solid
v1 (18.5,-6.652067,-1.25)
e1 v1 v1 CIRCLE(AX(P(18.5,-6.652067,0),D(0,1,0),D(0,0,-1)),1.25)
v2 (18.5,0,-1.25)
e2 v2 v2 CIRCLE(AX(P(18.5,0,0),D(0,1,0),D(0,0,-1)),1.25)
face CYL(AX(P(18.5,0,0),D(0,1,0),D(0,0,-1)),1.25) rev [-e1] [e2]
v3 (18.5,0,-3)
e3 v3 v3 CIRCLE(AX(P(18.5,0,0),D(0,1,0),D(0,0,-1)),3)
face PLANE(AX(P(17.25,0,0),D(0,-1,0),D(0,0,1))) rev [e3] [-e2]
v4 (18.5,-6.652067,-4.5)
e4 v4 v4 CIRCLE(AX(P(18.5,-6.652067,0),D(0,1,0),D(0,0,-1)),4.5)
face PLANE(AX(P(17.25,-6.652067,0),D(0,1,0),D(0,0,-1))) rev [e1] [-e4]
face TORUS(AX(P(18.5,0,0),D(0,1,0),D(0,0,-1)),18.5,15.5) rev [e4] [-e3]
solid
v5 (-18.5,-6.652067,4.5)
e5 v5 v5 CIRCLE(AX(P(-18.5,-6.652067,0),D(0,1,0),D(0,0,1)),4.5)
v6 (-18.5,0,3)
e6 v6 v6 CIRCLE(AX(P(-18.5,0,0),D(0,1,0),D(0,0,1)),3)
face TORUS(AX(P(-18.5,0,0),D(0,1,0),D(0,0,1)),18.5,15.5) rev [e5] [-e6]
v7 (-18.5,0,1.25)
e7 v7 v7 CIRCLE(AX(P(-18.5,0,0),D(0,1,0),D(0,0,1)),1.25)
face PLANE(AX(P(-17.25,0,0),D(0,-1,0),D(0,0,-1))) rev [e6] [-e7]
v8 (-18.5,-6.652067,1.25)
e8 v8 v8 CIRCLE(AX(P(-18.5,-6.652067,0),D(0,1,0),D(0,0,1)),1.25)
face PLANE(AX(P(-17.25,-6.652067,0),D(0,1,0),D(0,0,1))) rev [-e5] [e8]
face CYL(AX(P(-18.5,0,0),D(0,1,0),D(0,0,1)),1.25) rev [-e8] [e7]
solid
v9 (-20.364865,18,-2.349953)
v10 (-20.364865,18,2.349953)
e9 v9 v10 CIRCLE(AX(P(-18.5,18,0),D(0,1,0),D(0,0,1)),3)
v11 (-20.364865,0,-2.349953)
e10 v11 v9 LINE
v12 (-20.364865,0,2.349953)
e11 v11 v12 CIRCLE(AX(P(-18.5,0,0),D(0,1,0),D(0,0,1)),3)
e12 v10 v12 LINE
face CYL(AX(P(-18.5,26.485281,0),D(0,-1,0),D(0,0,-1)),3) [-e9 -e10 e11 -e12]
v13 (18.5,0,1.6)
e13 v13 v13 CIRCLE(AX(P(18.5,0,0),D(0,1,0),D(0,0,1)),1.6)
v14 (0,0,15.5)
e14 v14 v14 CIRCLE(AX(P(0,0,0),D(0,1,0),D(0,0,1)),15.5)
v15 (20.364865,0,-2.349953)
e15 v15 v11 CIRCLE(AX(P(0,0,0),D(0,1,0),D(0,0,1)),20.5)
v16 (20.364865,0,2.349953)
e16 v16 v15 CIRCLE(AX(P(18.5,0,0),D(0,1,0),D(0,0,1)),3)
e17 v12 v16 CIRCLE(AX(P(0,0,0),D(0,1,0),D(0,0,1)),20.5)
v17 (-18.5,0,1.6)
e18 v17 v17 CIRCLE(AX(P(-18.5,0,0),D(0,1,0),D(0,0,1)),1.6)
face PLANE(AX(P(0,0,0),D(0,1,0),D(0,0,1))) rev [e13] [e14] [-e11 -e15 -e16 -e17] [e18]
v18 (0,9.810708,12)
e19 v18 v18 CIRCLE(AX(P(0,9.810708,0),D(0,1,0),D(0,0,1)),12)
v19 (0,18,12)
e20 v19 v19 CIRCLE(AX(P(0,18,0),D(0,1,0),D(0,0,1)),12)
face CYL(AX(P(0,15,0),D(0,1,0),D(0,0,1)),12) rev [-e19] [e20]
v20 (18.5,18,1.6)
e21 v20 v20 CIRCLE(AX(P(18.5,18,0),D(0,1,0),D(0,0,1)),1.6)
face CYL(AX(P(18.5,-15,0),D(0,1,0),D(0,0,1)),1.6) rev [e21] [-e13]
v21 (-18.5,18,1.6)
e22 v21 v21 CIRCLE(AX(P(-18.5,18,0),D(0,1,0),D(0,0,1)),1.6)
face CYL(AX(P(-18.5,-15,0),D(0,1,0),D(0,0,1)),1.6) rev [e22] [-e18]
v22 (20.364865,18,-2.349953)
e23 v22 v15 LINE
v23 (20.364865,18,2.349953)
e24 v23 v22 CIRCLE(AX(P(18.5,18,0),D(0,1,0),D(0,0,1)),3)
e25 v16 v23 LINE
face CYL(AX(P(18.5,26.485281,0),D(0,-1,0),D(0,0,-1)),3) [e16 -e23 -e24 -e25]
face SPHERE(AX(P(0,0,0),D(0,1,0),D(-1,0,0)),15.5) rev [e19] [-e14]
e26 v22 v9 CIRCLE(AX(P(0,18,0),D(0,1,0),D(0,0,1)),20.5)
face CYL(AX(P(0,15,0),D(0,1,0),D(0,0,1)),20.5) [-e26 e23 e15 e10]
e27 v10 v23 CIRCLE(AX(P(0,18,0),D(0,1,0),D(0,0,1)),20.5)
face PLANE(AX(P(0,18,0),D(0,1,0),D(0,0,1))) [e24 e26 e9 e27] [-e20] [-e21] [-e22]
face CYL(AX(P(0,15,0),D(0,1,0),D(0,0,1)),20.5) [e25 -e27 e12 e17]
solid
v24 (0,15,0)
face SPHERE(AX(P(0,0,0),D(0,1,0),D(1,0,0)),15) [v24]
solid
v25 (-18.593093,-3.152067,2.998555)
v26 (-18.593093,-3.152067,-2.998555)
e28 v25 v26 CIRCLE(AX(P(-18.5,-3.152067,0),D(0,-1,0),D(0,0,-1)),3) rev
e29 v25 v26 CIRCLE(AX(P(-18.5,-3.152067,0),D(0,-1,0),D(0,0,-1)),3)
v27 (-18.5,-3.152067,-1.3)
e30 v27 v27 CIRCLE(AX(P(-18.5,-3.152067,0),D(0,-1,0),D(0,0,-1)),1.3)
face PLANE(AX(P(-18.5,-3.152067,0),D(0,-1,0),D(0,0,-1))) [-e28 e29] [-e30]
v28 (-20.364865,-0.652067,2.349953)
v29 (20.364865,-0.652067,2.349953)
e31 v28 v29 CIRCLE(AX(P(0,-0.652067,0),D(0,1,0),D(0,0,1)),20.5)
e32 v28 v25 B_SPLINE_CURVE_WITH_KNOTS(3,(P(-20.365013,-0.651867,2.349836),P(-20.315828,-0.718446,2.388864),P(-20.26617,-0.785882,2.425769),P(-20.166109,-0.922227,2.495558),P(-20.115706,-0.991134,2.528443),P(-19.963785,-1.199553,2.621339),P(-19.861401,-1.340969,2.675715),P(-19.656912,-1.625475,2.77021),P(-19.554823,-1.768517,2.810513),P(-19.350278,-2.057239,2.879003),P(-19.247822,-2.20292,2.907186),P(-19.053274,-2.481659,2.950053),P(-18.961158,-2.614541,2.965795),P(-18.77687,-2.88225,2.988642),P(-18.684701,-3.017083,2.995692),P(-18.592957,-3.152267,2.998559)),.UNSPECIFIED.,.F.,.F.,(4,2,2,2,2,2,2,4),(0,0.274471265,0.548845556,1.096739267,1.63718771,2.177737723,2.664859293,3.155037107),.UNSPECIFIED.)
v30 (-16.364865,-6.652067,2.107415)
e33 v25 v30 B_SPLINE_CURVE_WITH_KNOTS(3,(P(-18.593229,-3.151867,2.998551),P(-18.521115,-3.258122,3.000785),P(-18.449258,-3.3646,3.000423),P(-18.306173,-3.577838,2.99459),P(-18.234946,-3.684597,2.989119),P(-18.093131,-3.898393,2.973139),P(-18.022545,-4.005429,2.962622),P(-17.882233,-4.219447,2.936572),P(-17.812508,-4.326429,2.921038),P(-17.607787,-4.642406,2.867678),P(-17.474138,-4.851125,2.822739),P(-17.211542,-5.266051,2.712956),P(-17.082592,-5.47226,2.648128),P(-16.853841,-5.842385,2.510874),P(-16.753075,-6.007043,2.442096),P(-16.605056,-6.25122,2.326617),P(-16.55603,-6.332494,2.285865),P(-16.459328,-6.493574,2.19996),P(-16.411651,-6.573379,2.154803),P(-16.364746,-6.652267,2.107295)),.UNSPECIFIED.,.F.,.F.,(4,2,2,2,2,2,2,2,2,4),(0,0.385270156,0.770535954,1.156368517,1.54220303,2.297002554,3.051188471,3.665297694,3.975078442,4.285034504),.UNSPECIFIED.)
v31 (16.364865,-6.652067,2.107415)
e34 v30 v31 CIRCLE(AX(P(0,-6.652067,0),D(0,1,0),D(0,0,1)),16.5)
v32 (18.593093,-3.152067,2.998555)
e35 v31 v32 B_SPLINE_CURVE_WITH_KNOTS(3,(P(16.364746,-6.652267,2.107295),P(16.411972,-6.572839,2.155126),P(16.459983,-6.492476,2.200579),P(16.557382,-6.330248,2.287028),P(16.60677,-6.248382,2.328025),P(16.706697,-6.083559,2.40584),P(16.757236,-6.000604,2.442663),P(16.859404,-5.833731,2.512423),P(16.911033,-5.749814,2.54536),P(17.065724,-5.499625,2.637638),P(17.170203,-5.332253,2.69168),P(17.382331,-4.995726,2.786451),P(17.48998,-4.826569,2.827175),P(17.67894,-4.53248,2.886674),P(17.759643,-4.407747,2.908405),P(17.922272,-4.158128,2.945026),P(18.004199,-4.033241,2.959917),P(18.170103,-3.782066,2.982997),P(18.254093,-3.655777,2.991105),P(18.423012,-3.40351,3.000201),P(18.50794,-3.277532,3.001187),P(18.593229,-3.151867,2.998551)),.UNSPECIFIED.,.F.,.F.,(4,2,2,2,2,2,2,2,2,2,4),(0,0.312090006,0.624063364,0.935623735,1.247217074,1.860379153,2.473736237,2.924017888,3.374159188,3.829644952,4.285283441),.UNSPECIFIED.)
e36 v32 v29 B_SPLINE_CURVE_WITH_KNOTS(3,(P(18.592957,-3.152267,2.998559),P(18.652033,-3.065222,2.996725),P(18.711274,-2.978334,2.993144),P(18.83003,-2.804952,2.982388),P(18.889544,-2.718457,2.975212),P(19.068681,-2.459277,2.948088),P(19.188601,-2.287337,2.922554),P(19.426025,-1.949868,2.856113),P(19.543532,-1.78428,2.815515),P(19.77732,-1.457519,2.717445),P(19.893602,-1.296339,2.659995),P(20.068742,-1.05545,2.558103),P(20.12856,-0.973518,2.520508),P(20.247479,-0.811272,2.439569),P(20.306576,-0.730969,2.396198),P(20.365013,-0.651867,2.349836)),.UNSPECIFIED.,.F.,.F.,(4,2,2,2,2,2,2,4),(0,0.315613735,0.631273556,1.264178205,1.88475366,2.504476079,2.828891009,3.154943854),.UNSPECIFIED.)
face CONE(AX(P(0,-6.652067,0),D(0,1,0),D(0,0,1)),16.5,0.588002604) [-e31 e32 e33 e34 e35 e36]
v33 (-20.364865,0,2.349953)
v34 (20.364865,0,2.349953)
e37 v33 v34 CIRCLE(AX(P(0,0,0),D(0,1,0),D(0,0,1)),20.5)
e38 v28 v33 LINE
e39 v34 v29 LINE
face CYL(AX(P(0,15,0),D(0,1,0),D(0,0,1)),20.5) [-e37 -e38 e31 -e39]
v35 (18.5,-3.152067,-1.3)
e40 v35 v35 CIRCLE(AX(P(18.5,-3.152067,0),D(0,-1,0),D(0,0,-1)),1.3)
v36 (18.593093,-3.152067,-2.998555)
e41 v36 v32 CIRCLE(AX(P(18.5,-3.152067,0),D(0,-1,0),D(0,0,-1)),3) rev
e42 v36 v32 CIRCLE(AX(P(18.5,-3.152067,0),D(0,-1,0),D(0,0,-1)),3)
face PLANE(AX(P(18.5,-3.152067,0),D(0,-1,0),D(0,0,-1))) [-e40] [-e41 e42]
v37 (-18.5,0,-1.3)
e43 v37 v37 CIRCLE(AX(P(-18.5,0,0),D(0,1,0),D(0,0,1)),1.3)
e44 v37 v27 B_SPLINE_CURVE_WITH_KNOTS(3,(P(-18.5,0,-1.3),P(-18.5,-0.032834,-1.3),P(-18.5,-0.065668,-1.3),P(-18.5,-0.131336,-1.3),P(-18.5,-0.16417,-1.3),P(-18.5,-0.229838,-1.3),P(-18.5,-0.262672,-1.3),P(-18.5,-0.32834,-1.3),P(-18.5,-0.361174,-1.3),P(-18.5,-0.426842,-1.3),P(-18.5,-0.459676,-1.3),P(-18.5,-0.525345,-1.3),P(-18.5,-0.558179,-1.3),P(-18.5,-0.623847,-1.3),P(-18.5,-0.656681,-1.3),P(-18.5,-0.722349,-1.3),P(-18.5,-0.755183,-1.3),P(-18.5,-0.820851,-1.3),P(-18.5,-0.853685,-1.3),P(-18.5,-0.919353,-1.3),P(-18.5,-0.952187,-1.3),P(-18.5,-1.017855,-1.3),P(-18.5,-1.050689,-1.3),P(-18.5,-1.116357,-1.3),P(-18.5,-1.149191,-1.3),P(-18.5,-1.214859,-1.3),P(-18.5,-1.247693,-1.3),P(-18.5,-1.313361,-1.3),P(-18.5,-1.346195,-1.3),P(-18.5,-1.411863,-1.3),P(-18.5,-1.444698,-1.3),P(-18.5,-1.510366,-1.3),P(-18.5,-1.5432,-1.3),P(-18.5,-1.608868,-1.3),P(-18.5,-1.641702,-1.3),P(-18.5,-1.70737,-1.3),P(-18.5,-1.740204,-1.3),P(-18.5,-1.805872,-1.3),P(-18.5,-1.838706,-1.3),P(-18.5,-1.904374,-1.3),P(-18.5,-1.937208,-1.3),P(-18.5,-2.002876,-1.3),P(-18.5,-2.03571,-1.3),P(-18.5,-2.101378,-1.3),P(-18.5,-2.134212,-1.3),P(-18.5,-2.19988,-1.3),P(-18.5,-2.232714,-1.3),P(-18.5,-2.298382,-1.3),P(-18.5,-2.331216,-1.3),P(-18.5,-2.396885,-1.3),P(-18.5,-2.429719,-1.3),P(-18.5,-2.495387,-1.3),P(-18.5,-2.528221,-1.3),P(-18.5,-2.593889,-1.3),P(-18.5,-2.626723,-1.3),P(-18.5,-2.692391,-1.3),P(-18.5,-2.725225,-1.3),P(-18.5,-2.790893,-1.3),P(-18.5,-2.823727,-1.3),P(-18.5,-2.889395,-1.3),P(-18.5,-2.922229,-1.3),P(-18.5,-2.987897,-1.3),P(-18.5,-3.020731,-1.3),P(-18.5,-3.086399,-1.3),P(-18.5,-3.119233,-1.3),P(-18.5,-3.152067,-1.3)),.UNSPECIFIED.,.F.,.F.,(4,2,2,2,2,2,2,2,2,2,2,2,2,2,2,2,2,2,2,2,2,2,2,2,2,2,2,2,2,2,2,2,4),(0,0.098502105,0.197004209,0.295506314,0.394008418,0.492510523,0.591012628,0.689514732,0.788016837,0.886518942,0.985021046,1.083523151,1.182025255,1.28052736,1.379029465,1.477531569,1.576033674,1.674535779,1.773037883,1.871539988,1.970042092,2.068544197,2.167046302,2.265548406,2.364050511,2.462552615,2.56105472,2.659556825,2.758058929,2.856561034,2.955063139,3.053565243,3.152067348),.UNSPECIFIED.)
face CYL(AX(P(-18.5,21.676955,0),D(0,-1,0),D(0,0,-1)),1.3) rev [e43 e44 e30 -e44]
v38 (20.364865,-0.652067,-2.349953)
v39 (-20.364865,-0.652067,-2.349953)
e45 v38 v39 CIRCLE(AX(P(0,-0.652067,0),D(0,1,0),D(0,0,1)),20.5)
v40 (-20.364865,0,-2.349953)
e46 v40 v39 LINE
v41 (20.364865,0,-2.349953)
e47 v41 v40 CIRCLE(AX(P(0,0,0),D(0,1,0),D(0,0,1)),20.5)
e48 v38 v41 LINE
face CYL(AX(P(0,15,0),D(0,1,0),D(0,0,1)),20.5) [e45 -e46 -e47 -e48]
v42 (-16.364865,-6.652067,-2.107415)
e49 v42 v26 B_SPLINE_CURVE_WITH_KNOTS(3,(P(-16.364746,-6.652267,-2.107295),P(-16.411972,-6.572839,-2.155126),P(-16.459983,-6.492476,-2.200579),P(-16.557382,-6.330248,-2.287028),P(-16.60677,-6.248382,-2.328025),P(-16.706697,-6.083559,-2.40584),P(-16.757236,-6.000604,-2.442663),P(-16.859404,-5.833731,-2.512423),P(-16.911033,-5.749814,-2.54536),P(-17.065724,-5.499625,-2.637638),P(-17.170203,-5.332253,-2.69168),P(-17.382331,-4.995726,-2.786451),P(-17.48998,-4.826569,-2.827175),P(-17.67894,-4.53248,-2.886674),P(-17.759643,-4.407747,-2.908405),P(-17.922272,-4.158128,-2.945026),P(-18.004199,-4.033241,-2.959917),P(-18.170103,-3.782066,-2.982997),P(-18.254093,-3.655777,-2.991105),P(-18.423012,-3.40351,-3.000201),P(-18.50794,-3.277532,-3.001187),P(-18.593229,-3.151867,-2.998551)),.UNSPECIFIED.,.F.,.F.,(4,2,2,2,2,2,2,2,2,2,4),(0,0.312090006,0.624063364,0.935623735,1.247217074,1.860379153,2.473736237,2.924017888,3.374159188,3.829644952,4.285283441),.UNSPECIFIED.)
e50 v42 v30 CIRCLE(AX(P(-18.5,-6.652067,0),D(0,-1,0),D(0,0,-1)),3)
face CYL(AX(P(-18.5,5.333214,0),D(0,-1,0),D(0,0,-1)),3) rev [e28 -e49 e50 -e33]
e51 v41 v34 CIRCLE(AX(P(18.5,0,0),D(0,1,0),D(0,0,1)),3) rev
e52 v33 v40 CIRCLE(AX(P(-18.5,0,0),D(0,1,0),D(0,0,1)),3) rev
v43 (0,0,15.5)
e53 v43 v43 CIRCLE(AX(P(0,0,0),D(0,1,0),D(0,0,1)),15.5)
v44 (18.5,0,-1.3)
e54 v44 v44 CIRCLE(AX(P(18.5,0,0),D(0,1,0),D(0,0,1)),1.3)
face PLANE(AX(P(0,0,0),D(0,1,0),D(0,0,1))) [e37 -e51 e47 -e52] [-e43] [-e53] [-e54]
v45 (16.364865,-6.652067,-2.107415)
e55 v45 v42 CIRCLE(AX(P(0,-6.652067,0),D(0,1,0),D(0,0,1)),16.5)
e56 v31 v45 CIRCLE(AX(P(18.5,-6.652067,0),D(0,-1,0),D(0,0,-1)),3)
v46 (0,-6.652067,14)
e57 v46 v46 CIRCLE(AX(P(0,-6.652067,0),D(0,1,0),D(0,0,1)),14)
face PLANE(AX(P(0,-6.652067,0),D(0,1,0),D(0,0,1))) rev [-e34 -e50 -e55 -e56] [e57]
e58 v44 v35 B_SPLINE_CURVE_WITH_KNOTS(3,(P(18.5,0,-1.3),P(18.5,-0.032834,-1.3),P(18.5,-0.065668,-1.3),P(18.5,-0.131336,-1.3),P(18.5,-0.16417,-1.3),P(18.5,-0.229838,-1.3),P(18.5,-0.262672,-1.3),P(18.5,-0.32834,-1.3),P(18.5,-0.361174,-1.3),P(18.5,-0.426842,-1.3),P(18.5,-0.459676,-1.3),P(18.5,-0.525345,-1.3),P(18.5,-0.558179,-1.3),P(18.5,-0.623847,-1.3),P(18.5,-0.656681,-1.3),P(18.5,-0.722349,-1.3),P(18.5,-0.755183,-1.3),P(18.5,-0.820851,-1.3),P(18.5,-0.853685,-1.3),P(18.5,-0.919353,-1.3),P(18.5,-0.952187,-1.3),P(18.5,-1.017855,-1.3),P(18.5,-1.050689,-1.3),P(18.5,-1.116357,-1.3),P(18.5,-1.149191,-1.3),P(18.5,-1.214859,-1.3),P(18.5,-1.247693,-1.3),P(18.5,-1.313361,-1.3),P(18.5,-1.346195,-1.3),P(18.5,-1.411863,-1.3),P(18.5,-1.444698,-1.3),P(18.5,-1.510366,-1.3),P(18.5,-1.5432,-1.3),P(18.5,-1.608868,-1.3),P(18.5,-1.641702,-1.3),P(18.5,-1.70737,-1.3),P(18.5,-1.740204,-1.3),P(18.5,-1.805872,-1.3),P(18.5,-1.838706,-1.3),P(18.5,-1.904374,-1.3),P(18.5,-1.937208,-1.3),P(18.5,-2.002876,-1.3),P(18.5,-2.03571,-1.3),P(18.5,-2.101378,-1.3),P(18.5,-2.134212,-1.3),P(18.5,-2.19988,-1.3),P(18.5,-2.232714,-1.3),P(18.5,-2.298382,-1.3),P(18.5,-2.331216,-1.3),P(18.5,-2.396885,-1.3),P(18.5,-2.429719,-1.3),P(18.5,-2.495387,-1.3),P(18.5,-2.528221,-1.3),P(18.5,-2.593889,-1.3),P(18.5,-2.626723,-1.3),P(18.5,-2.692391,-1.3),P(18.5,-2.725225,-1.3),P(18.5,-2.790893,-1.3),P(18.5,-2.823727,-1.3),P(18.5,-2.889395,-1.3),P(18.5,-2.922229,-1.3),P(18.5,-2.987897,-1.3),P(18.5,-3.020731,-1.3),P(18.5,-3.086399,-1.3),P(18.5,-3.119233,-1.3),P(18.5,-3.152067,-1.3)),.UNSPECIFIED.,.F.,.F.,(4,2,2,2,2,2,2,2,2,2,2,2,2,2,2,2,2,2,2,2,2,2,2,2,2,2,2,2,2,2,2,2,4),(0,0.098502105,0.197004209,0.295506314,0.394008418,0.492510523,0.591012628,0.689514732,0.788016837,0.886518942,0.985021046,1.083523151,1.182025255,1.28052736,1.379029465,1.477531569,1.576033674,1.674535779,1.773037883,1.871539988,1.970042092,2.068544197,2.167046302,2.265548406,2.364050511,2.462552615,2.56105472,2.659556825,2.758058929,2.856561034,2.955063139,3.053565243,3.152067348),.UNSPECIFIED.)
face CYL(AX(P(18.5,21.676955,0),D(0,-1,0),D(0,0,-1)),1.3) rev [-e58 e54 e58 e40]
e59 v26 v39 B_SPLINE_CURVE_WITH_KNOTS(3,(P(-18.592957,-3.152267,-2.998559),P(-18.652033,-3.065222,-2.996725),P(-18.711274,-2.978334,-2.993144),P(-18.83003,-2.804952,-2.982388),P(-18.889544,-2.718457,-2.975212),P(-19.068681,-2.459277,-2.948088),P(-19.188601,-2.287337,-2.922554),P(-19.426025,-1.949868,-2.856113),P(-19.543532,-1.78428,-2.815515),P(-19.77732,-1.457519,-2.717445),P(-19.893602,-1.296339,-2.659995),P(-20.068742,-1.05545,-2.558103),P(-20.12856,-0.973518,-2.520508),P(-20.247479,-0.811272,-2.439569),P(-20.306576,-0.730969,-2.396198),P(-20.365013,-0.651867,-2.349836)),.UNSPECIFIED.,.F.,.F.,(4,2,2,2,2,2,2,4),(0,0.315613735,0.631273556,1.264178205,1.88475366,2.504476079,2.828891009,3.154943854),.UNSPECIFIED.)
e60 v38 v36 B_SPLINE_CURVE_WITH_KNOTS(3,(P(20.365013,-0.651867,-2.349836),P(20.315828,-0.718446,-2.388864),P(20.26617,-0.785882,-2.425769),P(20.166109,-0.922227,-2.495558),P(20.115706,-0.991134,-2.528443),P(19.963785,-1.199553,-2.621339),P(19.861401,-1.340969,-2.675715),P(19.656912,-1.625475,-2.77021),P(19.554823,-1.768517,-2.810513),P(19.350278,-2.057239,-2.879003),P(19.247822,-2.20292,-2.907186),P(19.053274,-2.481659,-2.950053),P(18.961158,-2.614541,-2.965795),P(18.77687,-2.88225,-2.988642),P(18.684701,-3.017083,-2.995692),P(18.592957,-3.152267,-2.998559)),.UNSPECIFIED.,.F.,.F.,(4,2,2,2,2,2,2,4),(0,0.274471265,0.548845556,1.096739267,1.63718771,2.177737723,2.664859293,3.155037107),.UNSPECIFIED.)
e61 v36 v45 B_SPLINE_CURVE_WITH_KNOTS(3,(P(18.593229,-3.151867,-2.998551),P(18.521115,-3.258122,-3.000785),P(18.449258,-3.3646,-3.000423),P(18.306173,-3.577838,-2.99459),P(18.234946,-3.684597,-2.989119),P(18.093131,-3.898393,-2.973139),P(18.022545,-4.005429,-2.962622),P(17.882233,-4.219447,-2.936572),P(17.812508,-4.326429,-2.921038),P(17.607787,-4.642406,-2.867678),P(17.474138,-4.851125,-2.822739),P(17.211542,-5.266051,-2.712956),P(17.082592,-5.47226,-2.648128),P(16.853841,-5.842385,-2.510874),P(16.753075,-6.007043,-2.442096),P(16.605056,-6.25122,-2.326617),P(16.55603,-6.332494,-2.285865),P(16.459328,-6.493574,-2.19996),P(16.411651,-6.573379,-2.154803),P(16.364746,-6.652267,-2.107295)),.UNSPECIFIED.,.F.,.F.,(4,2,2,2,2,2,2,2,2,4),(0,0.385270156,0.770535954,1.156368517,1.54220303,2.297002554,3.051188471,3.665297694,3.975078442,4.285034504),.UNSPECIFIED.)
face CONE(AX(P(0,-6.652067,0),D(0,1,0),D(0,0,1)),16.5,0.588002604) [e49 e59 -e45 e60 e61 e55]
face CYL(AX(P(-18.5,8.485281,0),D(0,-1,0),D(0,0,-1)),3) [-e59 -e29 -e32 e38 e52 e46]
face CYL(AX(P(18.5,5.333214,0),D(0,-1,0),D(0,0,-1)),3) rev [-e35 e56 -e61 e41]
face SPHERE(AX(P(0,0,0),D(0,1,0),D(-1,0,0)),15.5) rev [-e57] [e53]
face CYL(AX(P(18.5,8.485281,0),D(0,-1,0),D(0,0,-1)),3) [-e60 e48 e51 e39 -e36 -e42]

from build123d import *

# Parameters (mm, degrees)
EXTRUDE_START            = -6.652067348
EXTRUDE_3_OUTLINE_R      = 3
EXTRUDE_3_DEPTH          = 3.152067348
SKETCH_4_2_R             = 3
CUT_EXTRUDE_2_DEPTH      = 3.5
EXTRUDE_START_2          = -6.652067
SKETCH_4_3_R             = 3
EXTRUDE_4_DEPTH          = 18
CUT_EXTRUDE_START        = -21.152068
SKETCH_6_R               = 1.3
CUT_EXTRUDE_3_DEPTH      = 24.652068
SKETCH_8_R               = 1.6
CUT_EXTRUDE_4_DEPTH      = 45.401576643
PATTERN_CIRCULAR_1_COUNT = 2


# Read off the part's stored shape, not the designer's step: ﾎﾞｽ - 押し出し3
with BuildPart() as part:
    # ｽｹｯﾁ1 → 回転2 (revolve)
    with BuildSketch(Plane.XY, mode=Mode.PRIVATE) as revolve_2_sk:
        with BuildLine():
            Line((-20.5, 0), (-15.5, 0))
            ThreePointArc((-15.5, 0), (-14.598801321, 5.208166664), (-12, 9.810708435))
            Line((-12, 9.810708435), (-12, 18))
            Line((-12, 18), (-20.5, 18))
            Line((-20.5, 18), (-20.5, 0))
        make_face()
        with BuildLine():
            Line((0, 15), (0, -15))
            ThreePointArc((0, -15), (-15, 0), (0, 15))
        make_face()
    revolve(revolve_2_sk.sketch.rotate(Axis((0, 15, 0), (0, -1, 0)), 270), axis=Axis((0, 15, 0), (0, -1, 0)))

    # ｽｹｯﾁ4<3> → ﾎﾞｽ - 押し出し4 (add)
    with BuildSketch(Plane.XZ.offset(6.652067348).offset(EXTRUDE_START_2)):
        with Locations((18.5, 0)):
            Circle(SKETCH_4_3_R)
        with Locations((-18.5, 0)):
            Circle(SKETCH_4_3_R)
    extrude(amount=-EXTRUDE_4_DEPTH)


with BuildPart() as body_2:
    # ｽｹｯﾁ1<3> → 回転3 (revolve)
    with BuildSketch(Plane.XY, mode=Mode.PRIVATE) as revolve_3_sk:
        with BuildLine():
            Line((-16.5, -6.652067348), (-14, -6.652067348))
            ThreePointArc((-14, -6.652067348), (-15.120350525, -3.409545424), (-15.5, 0))
            Line((-15.5, 0), (-20.5, 0))
            Line((-20.5, 0), (-20.5, -0.652067348))
            Line((-20.5, -0.652067348), (-16.5, -6.652067348))
        make_face()
    revolve(revolve_3_sk.sketch.rotate(Axis((0, 15, 0), (0, -1, 0)), 270), axis=Axis((0, 15, 0), (0, -1, 0)))

    # ﾎﾞｽ - 押し出し3 outline → ﾎﾞｽ - 押し出し3 (add)
    with BuildSketch(Plane.XZ.offset(6.652067348).offset(EXTRUDE_START)):
        with Locations((18.5, 0)):
            Circle(EXTRUDE_3_OUTLINE_R)
        with BuildLine():
            ThreePointArc((-18.593093093, -2.998555265), (-15.5, -1e-09), (-18.593093091, 2.998555265))
            ThreePointArc((-18.593093091, 2.998555265), (-21.5, 1e-09), (-18.593093093, -2.998555265))
        make_face()
    extrude(amount=EXTRUDE_3_DEPTH)

    # ｽｹｯﾁ4<2> → ｶｯﾄ - 押し出し2 (cut)
    with BuildSketch(Plane.XZ.offset(6.652067348)):
        with Locations((18.5, 0)):
            Circle(SKETCH_4_2_R)
        with Locations((-18.5, 0)):
            Circle(SKETCH_4_2_R)
    extrude(amount=-CUT_EXTRUDE_2_DEPTH, mode=Mode.SUBTRACT)


with BuildPart() as cut_extrude_3_tool:
    # ｽｹｯﾁ6 → ｶｯﾄ - 押し出し3 (new body)
    with BuildSketch(Plane.XZ.offset(3.152067348).offset(CUT_EXTRUDE_START)):
        with Locations(Location((18.5, 0, 0), (0, 0, 270))):
            Circle(SKETCH_6_R)
        with Locations(Location((-18.5, 0, 0), (0, 0, 270))):
            Circle(SKETCH_6_R)
    extrude(amount=CUT_EXTRUDE_3_DEPTH)


with BuildPart() as part_1:
    add(part.part)

    # ｶｯﾄ - 押し出し3: cut by cut_extrude_3_tool
    add(cut_extrude_3_tool.part, mode=Mode.SUBTRACT)

    # ｽｹｯﾁ8 → ｶｯﾄ - 押し出し4 (cut, through all)
    with BuildSketch(Plane(origin=(0, 18, 0), x_dir=(1, 0, 0), z_dir=(0, 1, 0))):
        with Locations(Location((18.5, 0, 0), (0, 0, 270))):
            Circle(SKETCH_8_R)
        with Locations(Location((-18.5, 0, 0), (0, 0, 270))):
            Circle(SKETCH_8_R)
    extrude(amount=-CUT_EXTRUDE_4_DEPTH, mode=Mode.SUBTRACT)


with BuildPart() as body_2_1:
    add(body_2.part)

    # ｶｯﾄ - 押し出し3: cut by cut_extrude_3_tool
    add(cut_extrude_3_tool.part, mode=Mode.SUBTRACT)


with BuildPart() as body_3:
    # ｽｹｯﾁ13 → 回転4 (revolve)
    with BuildSketch(Plane.XY, mode=Mode.PRIVATE) as revolve_4_sk:
        with BuildLine():
            Line((-17.25, 0), (-17.25, -6.652067348))
            Line((-17.25, -6.652067348), (-14, -6.652067348))
            ThreePointArc((-14, -6.652067348), (-15.120350525, -3.409545424), (-15.5, 0))
            Line((-15.5, 0), (-17.25, 0))
        make_face()
    revolve(revolve_4_sk.sketch.rotate(Axis((-18.5, 0, 0), (0, -1, 0)), 90), axis=Axis((-18.5, 0, 0), (0, -1, 0)))


with BuildPart() as pattern_circular_1_1:
    # 円形ﾊﾟﾀｰﾝ1: pattern copy
    add(body_3.part.rotate(Axis((0, 0, 0), (0, 1, 0)), 1 * 360 / PATTERN_CIRCULAR_1_COUNT))


solid = Compound([part_1.part, body_2_1.part, body_3.part, pattern_circular_1_1.part])
